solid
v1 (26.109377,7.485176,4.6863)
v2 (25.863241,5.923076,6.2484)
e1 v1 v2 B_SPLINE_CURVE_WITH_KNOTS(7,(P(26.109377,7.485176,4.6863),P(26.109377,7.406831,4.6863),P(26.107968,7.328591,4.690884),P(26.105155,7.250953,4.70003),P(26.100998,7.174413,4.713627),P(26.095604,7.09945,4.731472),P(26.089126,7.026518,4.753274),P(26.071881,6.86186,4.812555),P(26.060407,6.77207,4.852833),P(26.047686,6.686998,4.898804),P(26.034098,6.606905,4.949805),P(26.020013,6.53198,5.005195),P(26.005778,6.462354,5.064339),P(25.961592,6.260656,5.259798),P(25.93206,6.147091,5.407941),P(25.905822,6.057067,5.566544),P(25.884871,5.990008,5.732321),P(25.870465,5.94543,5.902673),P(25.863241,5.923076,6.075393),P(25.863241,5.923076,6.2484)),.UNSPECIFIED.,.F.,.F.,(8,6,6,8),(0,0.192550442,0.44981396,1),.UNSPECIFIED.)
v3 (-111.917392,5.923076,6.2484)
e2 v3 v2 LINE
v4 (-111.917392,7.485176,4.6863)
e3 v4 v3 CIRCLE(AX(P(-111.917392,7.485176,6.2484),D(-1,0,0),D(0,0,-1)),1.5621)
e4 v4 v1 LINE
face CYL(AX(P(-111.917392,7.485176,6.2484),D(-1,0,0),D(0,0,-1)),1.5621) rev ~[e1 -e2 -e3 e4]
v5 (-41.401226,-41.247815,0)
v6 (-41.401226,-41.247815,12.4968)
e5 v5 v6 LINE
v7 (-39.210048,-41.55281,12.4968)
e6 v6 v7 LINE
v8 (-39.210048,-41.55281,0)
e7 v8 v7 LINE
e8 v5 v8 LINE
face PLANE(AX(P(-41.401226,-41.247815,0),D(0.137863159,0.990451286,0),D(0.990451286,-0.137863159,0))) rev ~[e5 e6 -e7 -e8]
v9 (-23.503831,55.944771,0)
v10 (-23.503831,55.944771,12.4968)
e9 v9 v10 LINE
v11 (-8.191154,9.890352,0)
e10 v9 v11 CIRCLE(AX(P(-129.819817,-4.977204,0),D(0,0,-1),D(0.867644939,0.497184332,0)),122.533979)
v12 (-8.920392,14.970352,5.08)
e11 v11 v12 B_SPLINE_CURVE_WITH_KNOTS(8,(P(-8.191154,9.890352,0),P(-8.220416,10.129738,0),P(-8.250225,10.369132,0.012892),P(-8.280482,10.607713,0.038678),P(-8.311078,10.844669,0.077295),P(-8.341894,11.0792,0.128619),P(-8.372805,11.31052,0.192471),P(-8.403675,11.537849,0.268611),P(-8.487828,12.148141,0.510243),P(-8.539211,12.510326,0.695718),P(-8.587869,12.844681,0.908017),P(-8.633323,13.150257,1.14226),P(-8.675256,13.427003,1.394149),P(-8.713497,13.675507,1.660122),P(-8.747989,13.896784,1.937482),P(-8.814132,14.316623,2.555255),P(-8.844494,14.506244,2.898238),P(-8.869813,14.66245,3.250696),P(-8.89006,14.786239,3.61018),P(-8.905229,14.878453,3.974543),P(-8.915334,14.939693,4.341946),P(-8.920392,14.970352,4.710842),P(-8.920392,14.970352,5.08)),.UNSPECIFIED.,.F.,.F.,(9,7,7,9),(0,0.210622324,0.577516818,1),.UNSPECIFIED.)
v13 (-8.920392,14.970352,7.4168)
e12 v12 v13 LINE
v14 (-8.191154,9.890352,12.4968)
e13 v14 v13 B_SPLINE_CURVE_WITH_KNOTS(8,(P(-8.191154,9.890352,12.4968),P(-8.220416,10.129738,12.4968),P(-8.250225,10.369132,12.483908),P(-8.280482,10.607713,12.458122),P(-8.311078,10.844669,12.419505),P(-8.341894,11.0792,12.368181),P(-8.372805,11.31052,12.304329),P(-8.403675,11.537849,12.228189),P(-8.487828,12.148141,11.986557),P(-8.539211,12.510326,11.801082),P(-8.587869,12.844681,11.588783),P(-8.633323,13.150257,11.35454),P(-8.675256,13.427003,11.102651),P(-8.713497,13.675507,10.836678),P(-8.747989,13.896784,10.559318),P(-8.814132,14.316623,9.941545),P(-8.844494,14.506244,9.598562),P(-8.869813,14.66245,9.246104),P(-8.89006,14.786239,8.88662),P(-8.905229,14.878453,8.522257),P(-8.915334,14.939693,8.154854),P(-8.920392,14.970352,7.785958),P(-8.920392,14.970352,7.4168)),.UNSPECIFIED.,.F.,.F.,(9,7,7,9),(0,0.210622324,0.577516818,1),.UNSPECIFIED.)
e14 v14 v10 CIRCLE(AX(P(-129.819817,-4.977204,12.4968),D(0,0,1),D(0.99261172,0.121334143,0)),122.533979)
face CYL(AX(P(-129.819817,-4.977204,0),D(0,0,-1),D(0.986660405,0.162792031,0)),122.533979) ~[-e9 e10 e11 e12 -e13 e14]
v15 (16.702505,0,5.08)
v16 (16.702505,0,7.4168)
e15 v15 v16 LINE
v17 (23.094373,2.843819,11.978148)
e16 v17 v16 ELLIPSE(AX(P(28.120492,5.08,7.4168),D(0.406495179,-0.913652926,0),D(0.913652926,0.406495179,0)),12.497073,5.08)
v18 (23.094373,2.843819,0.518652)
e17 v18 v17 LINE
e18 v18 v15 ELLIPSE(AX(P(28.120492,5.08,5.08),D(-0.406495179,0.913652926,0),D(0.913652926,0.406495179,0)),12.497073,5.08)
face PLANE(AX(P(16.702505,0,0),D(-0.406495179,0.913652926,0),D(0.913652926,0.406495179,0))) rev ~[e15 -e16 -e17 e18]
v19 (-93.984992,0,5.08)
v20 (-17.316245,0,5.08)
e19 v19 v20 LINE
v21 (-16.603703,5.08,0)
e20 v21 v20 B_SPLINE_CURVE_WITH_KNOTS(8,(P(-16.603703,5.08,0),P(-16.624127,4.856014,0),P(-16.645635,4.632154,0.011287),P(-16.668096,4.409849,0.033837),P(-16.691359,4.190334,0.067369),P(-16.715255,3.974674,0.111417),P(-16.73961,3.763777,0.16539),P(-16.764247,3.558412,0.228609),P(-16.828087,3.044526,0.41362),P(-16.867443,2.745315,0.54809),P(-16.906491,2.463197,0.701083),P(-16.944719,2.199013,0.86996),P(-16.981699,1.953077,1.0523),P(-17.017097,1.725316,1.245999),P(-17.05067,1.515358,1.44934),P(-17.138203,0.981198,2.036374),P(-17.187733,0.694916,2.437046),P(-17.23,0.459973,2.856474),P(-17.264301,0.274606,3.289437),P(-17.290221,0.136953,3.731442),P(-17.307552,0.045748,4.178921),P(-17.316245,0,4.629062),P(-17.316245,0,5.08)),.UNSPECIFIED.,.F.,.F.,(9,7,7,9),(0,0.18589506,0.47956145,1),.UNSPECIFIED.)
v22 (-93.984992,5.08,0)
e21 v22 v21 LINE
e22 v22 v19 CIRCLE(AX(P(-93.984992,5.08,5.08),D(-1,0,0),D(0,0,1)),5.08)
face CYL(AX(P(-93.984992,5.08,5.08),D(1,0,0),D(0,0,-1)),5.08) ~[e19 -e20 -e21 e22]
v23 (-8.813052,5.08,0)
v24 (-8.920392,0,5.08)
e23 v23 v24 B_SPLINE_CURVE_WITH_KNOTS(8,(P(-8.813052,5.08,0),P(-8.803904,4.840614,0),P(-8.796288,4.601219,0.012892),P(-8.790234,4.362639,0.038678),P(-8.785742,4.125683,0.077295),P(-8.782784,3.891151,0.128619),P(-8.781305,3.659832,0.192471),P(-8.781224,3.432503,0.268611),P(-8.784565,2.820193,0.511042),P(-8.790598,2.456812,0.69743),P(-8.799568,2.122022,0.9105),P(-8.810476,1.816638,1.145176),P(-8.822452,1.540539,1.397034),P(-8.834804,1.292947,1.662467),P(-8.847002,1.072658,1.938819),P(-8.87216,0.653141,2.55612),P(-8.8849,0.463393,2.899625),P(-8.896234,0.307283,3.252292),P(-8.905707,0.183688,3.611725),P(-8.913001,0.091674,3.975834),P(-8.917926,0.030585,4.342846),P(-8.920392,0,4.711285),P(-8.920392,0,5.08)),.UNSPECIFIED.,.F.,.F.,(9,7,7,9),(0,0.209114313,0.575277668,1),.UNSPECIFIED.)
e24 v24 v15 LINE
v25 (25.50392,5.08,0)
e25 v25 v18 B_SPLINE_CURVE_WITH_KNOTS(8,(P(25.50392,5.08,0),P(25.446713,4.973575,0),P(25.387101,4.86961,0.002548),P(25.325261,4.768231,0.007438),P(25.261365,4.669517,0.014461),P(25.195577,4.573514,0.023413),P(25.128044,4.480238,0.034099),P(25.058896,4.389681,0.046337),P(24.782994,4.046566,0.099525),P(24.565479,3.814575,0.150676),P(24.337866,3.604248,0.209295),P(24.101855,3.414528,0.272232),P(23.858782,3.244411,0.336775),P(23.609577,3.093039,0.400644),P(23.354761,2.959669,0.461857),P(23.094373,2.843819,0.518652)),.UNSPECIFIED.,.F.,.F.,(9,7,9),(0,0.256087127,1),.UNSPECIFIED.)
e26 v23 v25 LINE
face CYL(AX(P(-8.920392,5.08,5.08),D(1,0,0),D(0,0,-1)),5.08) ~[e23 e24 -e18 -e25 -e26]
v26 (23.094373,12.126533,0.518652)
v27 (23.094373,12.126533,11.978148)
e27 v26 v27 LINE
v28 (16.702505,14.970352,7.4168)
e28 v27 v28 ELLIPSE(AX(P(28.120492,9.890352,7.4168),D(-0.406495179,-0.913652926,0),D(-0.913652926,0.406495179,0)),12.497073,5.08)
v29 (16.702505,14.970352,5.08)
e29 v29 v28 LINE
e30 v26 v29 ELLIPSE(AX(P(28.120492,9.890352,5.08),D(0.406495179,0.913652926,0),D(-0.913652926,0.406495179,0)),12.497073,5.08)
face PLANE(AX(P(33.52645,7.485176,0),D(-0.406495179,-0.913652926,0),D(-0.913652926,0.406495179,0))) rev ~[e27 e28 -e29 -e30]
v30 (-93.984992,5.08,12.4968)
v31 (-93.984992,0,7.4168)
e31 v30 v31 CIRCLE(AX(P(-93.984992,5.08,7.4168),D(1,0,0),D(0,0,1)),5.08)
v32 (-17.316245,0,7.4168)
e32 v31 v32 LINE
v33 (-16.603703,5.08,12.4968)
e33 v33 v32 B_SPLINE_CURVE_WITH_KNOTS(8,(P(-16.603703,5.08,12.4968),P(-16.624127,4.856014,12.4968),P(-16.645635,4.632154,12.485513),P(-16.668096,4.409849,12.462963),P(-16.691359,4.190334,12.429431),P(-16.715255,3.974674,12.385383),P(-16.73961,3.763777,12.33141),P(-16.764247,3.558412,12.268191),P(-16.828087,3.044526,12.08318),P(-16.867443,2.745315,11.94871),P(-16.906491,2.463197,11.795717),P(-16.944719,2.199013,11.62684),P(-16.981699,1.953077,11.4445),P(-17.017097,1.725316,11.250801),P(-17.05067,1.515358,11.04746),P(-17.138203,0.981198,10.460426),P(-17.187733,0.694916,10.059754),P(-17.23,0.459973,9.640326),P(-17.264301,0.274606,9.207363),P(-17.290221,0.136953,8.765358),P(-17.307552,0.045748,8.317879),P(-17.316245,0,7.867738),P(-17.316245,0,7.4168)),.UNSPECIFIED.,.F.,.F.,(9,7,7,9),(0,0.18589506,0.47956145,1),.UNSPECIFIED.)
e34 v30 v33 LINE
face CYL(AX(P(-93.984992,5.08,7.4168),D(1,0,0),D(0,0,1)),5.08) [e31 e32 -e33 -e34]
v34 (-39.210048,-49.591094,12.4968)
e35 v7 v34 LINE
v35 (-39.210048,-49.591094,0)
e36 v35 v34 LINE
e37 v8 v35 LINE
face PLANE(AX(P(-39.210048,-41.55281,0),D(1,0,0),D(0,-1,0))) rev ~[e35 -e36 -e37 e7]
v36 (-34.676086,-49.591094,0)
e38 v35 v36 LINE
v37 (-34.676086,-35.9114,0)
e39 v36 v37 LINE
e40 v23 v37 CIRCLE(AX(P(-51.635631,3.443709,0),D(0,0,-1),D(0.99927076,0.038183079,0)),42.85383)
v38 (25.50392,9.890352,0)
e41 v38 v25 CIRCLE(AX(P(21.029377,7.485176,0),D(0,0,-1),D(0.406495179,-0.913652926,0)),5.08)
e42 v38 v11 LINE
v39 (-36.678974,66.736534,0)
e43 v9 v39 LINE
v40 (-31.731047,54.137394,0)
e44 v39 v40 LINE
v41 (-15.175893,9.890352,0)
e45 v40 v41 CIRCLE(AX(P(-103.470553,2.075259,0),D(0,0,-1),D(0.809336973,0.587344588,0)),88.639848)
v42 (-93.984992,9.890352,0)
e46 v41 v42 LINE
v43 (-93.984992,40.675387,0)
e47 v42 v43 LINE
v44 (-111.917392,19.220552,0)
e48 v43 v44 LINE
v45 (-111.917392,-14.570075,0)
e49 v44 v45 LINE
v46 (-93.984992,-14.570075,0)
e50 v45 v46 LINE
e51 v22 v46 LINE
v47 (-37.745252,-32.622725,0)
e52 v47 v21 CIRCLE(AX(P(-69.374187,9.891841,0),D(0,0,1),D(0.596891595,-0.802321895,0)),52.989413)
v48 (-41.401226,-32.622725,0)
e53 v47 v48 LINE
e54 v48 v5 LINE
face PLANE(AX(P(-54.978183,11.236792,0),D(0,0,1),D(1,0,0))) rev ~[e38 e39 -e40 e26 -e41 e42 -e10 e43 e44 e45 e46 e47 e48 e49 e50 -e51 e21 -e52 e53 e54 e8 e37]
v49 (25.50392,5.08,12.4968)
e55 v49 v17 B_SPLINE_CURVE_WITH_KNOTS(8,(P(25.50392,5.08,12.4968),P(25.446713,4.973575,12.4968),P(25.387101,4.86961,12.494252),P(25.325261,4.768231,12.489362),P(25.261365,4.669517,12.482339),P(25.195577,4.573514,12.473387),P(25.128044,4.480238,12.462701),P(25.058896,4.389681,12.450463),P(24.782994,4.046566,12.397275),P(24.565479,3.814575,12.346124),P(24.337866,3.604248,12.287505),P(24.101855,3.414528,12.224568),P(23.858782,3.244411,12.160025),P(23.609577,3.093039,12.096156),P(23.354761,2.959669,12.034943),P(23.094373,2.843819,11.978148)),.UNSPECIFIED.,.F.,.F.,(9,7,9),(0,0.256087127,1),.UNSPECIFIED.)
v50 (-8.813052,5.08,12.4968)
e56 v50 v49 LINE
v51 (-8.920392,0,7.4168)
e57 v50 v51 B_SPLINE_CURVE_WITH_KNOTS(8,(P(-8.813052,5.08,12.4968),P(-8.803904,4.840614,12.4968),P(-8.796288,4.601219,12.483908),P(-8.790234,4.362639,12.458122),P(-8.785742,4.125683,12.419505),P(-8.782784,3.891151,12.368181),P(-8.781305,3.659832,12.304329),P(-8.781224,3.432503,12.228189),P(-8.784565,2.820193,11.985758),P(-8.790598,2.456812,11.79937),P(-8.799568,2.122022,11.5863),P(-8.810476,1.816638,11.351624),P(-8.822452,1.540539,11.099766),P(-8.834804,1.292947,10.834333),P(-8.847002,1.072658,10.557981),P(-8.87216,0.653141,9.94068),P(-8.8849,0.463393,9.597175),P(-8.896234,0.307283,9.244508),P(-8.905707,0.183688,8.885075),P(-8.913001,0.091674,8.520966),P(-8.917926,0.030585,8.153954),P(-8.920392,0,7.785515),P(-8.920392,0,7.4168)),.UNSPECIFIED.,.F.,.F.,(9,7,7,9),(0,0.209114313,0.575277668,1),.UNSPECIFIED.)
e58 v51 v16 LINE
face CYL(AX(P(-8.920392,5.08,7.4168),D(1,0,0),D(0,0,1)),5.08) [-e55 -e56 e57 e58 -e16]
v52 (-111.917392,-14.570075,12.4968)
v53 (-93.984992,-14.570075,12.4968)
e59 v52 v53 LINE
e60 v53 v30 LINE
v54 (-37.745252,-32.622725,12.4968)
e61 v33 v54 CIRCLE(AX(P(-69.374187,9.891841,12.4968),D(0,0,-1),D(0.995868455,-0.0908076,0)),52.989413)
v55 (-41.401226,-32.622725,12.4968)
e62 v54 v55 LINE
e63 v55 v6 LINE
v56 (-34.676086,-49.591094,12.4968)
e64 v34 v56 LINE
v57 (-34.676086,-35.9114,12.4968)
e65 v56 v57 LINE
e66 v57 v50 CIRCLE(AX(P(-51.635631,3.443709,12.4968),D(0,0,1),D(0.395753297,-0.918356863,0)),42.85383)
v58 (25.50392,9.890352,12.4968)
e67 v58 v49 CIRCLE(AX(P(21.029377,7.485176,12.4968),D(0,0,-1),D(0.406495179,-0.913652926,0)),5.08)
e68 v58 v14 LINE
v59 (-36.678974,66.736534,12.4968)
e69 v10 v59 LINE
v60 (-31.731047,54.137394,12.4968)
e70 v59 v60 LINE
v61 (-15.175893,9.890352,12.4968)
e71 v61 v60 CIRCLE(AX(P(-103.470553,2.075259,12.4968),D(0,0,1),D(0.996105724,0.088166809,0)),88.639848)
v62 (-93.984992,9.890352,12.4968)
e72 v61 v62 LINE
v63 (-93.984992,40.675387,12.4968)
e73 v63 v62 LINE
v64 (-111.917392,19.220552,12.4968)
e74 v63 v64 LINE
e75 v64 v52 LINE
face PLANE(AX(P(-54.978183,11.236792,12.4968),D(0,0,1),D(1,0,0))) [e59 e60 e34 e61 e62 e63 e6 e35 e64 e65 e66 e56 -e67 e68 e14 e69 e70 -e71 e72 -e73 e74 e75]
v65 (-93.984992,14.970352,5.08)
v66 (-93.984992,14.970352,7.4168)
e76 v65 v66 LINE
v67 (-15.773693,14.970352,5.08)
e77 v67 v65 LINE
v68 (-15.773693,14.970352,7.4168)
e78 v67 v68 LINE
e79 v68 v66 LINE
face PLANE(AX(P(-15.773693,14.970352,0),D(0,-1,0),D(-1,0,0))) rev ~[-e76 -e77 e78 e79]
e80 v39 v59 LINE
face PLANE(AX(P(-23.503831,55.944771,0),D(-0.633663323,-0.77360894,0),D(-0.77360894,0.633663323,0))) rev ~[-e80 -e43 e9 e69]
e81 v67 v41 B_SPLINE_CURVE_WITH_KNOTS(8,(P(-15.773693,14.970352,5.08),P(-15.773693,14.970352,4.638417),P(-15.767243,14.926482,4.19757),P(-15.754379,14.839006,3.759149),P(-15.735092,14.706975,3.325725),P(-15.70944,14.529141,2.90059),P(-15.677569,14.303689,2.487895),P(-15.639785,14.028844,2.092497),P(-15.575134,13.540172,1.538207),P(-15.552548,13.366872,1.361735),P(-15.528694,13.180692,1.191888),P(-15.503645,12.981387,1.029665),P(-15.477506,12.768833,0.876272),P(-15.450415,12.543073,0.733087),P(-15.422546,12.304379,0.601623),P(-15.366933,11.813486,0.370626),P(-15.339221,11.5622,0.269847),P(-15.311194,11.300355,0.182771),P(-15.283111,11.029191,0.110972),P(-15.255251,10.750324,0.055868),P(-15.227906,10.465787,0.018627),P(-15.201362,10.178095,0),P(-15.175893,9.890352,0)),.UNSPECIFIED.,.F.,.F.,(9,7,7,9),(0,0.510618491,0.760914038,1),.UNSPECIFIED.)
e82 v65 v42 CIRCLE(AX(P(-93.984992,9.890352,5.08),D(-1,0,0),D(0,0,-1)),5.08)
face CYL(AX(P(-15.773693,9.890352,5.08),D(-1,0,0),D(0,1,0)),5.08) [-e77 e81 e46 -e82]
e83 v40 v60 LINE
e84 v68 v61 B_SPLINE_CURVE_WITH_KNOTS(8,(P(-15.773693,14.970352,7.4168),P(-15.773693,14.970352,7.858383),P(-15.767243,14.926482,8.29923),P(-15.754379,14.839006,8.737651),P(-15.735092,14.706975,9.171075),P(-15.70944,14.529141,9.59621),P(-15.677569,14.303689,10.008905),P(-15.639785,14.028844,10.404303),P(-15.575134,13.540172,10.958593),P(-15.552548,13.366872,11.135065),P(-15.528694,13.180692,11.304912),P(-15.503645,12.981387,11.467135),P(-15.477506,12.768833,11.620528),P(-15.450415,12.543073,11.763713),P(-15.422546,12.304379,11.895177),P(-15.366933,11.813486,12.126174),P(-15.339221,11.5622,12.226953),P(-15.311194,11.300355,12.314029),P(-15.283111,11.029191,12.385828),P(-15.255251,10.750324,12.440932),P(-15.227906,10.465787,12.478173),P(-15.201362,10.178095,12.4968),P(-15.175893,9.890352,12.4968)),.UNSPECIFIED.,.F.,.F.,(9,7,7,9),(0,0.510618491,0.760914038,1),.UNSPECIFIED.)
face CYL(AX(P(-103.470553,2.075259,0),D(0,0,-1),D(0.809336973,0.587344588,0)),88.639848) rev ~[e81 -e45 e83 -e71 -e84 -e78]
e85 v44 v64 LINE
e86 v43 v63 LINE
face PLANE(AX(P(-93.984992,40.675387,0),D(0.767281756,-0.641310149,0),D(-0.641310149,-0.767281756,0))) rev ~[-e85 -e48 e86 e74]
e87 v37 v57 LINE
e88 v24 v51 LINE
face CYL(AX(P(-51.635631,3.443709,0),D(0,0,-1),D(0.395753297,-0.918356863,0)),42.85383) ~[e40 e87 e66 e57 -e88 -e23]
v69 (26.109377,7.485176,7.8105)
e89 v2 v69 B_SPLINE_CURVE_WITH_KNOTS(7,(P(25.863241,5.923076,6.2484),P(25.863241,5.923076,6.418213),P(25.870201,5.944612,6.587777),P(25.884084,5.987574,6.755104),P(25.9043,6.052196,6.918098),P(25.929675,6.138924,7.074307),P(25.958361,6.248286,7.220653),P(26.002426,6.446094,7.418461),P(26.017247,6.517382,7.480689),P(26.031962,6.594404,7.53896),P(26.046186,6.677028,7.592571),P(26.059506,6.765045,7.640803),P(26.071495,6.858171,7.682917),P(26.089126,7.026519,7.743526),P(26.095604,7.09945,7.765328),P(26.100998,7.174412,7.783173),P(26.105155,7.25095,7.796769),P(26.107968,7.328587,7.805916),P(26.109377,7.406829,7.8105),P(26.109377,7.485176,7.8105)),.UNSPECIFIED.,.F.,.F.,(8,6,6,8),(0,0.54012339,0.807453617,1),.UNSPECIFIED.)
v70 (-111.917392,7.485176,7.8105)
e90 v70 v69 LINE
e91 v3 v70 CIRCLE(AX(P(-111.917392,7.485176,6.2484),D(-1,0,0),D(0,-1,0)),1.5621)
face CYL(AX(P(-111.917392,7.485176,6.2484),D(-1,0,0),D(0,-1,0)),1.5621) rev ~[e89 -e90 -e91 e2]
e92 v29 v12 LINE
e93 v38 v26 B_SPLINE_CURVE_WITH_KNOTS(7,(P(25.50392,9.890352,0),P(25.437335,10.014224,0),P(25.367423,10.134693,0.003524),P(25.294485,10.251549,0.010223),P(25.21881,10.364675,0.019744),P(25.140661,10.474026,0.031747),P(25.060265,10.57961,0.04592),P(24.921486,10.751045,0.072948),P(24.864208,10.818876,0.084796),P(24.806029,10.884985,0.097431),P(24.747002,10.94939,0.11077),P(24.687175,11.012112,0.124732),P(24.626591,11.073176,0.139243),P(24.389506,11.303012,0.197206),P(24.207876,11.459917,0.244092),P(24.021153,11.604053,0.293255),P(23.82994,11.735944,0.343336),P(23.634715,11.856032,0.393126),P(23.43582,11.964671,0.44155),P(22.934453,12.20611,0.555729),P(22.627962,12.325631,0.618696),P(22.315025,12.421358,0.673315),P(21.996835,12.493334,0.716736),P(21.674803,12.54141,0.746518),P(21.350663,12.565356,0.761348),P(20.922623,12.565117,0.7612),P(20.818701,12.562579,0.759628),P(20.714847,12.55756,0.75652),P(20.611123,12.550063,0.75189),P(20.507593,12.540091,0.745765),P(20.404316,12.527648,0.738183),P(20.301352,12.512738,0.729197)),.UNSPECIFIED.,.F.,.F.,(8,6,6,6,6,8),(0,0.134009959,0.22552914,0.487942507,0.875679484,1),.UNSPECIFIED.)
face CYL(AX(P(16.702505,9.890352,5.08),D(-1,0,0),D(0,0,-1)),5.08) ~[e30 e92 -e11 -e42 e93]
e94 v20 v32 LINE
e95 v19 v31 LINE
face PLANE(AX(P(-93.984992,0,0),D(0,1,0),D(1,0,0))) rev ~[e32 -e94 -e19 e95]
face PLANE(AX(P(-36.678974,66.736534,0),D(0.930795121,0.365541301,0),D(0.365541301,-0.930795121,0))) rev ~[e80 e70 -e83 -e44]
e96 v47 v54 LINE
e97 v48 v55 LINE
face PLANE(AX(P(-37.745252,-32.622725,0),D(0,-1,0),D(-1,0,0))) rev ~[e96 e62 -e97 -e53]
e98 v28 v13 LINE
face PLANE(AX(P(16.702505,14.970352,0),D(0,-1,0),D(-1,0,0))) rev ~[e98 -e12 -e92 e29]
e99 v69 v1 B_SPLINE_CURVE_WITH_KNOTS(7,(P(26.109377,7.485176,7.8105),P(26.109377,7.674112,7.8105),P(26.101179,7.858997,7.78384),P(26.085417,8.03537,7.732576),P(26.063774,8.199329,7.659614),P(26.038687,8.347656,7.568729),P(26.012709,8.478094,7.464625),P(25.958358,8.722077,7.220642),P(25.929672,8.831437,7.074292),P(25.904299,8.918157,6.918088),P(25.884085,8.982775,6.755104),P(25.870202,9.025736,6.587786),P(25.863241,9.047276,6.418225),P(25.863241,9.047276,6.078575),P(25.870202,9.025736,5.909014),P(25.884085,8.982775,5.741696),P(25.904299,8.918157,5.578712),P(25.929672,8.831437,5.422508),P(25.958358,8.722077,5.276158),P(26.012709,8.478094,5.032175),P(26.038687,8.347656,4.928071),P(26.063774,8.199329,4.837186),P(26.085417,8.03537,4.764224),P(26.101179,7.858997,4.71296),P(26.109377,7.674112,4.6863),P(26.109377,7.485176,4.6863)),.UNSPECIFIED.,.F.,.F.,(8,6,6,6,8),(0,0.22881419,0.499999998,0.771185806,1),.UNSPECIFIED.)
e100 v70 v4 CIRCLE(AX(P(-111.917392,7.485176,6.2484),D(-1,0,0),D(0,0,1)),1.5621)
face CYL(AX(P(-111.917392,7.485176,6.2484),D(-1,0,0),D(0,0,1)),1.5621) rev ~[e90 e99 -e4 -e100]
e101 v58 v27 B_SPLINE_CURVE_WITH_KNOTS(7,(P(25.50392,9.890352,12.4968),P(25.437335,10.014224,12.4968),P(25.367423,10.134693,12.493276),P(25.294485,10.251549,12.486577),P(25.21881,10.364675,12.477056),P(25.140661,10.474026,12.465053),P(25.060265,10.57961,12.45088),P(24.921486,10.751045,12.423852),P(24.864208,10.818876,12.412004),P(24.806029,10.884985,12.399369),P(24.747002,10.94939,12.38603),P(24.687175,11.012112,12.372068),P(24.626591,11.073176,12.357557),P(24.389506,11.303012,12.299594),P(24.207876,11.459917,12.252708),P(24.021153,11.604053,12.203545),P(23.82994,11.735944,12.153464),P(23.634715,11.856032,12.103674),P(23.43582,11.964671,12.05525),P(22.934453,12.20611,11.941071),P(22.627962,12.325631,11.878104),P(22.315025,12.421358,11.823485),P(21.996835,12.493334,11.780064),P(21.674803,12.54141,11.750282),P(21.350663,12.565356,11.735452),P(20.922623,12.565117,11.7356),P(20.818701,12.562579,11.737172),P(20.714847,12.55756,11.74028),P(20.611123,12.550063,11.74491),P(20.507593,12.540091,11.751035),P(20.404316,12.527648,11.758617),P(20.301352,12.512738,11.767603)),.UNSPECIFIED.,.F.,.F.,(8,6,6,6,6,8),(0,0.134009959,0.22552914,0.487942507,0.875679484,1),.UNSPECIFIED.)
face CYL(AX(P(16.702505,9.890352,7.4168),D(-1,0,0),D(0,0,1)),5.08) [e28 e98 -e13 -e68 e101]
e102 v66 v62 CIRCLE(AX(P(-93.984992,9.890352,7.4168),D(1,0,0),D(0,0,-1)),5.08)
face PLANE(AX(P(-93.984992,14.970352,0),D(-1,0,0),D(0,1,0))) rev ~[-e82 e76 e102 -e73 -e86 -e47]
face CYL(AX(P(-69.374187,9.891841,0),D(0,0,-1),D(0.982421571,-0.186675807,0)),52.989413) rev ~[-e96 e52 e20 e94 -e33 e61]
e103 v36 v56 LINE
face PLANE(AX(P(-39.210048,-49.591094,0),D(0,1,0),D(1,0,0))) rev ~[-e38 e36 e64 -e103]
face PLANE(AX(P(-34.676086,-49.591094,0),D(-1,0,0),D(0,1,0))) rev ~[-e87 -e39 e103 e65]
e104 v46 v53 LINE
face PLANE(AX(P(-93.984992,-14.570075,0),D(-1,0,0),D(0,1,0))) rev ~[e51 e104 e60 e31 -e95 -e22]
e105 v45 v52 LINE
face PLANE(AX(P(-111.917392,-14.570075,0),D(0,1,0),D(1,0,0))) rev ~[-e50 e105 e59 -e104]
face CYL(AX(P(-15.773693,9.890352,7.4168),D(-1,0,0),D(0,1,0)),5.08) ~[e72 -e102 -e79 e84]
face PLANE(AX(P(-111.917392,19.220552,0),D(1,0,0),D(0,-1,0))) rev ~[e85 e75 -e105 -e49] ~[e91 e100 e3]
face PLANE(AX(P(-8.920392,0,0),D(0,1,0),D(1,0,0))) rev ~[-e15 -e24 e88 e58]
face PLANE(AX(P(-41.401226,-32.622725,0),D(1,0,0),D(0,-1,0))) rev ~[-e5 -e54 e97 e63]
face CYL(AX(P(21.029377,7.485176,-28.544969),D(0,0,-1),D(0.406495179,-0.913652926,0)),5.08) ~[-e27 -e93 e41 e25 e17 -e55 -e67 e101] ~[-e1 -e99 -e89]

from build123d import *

# Parameters (mm, degrees)
F1_DEPTH    = 12.4968
F3_DEPTH    = 152.4
F4_T1_DEPTH = 61.7762374031
F5_R        = 5.08


# Not quite as in the source:
# - a fillet or chamfer that OpenCascade refuses, or shapes differently, is made with other operations: its cross-section is extruded or revolved along the edge and cut away or added
# - a feature names something its author has since deleted; it is built from what else it names


with BuildPart() as f1:
    # F0 (on Top) → F1 (new body)
    with BuildSketch(Plane.XY):
        with BuildLine():
            Line((-93.9849921167, 7.4851757918), (-16.1919427612, 7.4851757918))
            ThreePointArc((-16.1919427612, 7.4851757918), (-15.8959532901, 11.2229099464), (-15.7736930996, 14.9703515835))
            Line((-15.7736930996, 14.9703515835), (-93.9849921167, 14.9703515835))
            Line((-93.9849921167, 14.9703515835), (-93.9849921167, 7.4851757918))
        make_face()
        with BuildLine():
            Line((-93.9849921167, 0), (-17.3162451786, 0))
            ThreePointArc((-17.3162451786, 0), (-16.6663908007, 3.7294145399), (-16.1919427612, 7.4851757918))
            Line((-16.1919427612, 7.4851757918), (-93.9849921167, 7.4851757918))
            Line((-93.9849921167, 7.4851757918), (-93.9849921167, 0))
        make_face()
        Polygon((-93.9849921167, -14.5700745956), (-93.9849921167, 0), (-93.9849921167, 7.4851757918), (-93.9849921167, 14.9703515835), (-93.9849921167, 40.6753872946), (-111.9173921167, 19.2205523892), (-111.9173921167, 14.5700745956), (-111.9173921167, -14.5700745956), align=None)
        with BuildLine():
            Line((-15.7736930996, 14.9703515835), (-8.9203921167, 14.9703515835))
            ThreePointArc((-8.9203921167, 14.9703515835), (-14.3796310702, 36.1097695722), (-23.5038306564, 55.9447705746))
            Line((-23.5038306564, 55.9447705746), (-36.6789735854, 66.7365342379))
            Line((-36.6789735854, 66.7365342379), (-31.7310467362, 54.1373938322))
            ThreePointArc((-31.7310467362, 54.1373938322), (-21.3821676169, 35.5195355237), (-15.7736930996, 14.9703515835))
        make_face()
        with BuildLine():
            Line((-17.3162451786, 0), (-8.9203921167, 0))
            ThreePointArc((-8.9203921167, 0), (-8.270322019, 3.7175238692), (-8.0526666958, 7.4851757917))
            Line((-8.0526666958, 7.4851757918), (-16.1919427612, 7.4851757918))
            ThreePointArc((-16.1919427612, 7.4851757918), (-16.6663908007, 3.7294145399), (-17.3162451786, 0))
        make_face()
        with BuildLine():
            Line((-16.1919427612, 7.4851757918), (-8.0526666958, 7.4851757918))
            ThreePointArc((-8.0526666958, 7.4851757917), (-8.270322019, 11.2528277143), (-8.9203921167, 14.9703515835))
            Line((-8.9203921167, 14.9703515835), (-15.7736930996, 14.9703515835))
            ThreePointArc((-15.7736930996, 14.9703515835), (-15.8959532901, 11.2229099464), (-16.1919427612, 7.4851757918))
        make_face()
        with BuildLine():
            ThreePointArc((-34.6760861576, -35.9113998711), (-16.812117143, -21.5317519133), (-8.9203921167, 0))
            Line((-8.9203921167, 0), (-17.3162451786, 0))
            ThreePointArc((-17.3162451786, 0), (-24.4639001208, -18.231884723), (-37.7452522516, -32.6227247715))
            Line((-37.7452522516, -32.6227247715), (-41.4012260735, -32.6227247715))
            Line((-41.4012260735, -32.6227247715), (-41.4012260735, -41.2478148937))
            Line((-41.4012260735, -41.2478148937), (-39.2100475191, -41.5528100016))
            Line((-39.2100475191, -41.5528100016), (-39.2100475191, -49.5910942554))
            Line((-39.2100475191, -49.5910942554), (-34.6760861576, -49.5910942554))
            Line((-34.6760861576, -49.5910942554), (-34.6760861576, -35.9113998711))
        make_face()
        with BuildLine():
            ThreePointArc((-8.9203921167, 14.9703515835), (-8.270322019, 11.2528277143), (-8.0526666958, 7.4851757917))
            Line((-8.0526666958, 7.4851757918), (16.7025048286, 7.4851757918))
            Line((16.7025048286, 7.4851757918), (16.7025048286, 14.9703515835))
            Line((16.7025048286, 14.9703515835), (-8.9203921167, 14.9703515835))
        make_face()
        with BuildLine():
            ThreePointArc((-8.0526666958, 7.4851757917), (-8.270322019, 3.7175238692), (-8.9203921167, 0))
            Line((-8.9203921167, 0), (16.7025048286, 0))
            Line((16.7025048286, 0), (16.7025048286, 7.4851757918))
            Line((16.7025048286, 7.4851757918), (-8.0526666958, 7.4851757918))
        make_face()
        Polygon((16.7025048286, 7.4851757918), (16.7025048286, 0), (33.5264503956, 7.4851757918), (16.7025048286, 14.9703515835), align=None)
    extrude(amount=F1_DEPTH)

    # F2 (on face) → F3 (cut)
    with BuildSketch(Plane(origin=(-111.9173921167, 0, 0), x_dir=(0, -1, 0), z_dir=(-1, 0, 0))):
        with BuildLine():
            ThreePointArc((-5.9230757918, 6.2484), (-6.3806042889, 7.3529715029), (-7.4851757918, 7.8105))
            Line((-7.4851757918, 7.8105), (-7.4851757918, 4.6863))
            ThreePointArc((-7.4851757918, 4.6863), (-6.3806042889, 5.1438284971), (-5.9230757918, 6.2484))
        make_face()
        with BuildLine():
            Line((-7.4851757918, 4.6863), (-7.4851757918, 7.8105))
            ThreePointArc((-7.4851757918, 7.8105), (-9.0472757918, 6.2484), (-7.4851757918, 4.6863))
        make_face()
    extrude(amount=-F3_DEPTH, mode=Mode.SUBTRACT)

    # F4: fillet of radius 5.08 on 1 edges, made by hand

    # F4_s2 → F4_t1 (cut)
    with BuildSketch(Plane.XY.offset(-28.5449687015)):
        with BuildLine():
            ThreePointArc((23.0943727233, 2.843818927), (26.1093772139, 7.4851757918), (23.0943727233, 12.1265326565))
            Line((23.0943727233, 12.1265326565), (33.5264503956, 7.4851757918))
            Line((33.5264503956, 7.4851757918), (23.0943727233, 2.843818927))
        make_face()
    extrude(amount=F4_T1_DEPTH, mode=Mode.SUBTRACT)

    # F5
    f5_edges = [f1.edges().sort_by_distance(p)[0] for p in [
        (3.891056, 0, 12.4968),
        (3.891056, 14.970352, 12.4968),
        (3.891056, 0, 0),
        (3.891056, 14.970352, 0),
        (-54.879343, 14.970352, 12.4968),
        (-55.650619, 0, 12.4968),
        (-55.650619, 0, 0),
        (-54.879343, 14.970352, 0),
    ]]
    fillet(f5_edges, radius=F5_R)


solid = f1.part
